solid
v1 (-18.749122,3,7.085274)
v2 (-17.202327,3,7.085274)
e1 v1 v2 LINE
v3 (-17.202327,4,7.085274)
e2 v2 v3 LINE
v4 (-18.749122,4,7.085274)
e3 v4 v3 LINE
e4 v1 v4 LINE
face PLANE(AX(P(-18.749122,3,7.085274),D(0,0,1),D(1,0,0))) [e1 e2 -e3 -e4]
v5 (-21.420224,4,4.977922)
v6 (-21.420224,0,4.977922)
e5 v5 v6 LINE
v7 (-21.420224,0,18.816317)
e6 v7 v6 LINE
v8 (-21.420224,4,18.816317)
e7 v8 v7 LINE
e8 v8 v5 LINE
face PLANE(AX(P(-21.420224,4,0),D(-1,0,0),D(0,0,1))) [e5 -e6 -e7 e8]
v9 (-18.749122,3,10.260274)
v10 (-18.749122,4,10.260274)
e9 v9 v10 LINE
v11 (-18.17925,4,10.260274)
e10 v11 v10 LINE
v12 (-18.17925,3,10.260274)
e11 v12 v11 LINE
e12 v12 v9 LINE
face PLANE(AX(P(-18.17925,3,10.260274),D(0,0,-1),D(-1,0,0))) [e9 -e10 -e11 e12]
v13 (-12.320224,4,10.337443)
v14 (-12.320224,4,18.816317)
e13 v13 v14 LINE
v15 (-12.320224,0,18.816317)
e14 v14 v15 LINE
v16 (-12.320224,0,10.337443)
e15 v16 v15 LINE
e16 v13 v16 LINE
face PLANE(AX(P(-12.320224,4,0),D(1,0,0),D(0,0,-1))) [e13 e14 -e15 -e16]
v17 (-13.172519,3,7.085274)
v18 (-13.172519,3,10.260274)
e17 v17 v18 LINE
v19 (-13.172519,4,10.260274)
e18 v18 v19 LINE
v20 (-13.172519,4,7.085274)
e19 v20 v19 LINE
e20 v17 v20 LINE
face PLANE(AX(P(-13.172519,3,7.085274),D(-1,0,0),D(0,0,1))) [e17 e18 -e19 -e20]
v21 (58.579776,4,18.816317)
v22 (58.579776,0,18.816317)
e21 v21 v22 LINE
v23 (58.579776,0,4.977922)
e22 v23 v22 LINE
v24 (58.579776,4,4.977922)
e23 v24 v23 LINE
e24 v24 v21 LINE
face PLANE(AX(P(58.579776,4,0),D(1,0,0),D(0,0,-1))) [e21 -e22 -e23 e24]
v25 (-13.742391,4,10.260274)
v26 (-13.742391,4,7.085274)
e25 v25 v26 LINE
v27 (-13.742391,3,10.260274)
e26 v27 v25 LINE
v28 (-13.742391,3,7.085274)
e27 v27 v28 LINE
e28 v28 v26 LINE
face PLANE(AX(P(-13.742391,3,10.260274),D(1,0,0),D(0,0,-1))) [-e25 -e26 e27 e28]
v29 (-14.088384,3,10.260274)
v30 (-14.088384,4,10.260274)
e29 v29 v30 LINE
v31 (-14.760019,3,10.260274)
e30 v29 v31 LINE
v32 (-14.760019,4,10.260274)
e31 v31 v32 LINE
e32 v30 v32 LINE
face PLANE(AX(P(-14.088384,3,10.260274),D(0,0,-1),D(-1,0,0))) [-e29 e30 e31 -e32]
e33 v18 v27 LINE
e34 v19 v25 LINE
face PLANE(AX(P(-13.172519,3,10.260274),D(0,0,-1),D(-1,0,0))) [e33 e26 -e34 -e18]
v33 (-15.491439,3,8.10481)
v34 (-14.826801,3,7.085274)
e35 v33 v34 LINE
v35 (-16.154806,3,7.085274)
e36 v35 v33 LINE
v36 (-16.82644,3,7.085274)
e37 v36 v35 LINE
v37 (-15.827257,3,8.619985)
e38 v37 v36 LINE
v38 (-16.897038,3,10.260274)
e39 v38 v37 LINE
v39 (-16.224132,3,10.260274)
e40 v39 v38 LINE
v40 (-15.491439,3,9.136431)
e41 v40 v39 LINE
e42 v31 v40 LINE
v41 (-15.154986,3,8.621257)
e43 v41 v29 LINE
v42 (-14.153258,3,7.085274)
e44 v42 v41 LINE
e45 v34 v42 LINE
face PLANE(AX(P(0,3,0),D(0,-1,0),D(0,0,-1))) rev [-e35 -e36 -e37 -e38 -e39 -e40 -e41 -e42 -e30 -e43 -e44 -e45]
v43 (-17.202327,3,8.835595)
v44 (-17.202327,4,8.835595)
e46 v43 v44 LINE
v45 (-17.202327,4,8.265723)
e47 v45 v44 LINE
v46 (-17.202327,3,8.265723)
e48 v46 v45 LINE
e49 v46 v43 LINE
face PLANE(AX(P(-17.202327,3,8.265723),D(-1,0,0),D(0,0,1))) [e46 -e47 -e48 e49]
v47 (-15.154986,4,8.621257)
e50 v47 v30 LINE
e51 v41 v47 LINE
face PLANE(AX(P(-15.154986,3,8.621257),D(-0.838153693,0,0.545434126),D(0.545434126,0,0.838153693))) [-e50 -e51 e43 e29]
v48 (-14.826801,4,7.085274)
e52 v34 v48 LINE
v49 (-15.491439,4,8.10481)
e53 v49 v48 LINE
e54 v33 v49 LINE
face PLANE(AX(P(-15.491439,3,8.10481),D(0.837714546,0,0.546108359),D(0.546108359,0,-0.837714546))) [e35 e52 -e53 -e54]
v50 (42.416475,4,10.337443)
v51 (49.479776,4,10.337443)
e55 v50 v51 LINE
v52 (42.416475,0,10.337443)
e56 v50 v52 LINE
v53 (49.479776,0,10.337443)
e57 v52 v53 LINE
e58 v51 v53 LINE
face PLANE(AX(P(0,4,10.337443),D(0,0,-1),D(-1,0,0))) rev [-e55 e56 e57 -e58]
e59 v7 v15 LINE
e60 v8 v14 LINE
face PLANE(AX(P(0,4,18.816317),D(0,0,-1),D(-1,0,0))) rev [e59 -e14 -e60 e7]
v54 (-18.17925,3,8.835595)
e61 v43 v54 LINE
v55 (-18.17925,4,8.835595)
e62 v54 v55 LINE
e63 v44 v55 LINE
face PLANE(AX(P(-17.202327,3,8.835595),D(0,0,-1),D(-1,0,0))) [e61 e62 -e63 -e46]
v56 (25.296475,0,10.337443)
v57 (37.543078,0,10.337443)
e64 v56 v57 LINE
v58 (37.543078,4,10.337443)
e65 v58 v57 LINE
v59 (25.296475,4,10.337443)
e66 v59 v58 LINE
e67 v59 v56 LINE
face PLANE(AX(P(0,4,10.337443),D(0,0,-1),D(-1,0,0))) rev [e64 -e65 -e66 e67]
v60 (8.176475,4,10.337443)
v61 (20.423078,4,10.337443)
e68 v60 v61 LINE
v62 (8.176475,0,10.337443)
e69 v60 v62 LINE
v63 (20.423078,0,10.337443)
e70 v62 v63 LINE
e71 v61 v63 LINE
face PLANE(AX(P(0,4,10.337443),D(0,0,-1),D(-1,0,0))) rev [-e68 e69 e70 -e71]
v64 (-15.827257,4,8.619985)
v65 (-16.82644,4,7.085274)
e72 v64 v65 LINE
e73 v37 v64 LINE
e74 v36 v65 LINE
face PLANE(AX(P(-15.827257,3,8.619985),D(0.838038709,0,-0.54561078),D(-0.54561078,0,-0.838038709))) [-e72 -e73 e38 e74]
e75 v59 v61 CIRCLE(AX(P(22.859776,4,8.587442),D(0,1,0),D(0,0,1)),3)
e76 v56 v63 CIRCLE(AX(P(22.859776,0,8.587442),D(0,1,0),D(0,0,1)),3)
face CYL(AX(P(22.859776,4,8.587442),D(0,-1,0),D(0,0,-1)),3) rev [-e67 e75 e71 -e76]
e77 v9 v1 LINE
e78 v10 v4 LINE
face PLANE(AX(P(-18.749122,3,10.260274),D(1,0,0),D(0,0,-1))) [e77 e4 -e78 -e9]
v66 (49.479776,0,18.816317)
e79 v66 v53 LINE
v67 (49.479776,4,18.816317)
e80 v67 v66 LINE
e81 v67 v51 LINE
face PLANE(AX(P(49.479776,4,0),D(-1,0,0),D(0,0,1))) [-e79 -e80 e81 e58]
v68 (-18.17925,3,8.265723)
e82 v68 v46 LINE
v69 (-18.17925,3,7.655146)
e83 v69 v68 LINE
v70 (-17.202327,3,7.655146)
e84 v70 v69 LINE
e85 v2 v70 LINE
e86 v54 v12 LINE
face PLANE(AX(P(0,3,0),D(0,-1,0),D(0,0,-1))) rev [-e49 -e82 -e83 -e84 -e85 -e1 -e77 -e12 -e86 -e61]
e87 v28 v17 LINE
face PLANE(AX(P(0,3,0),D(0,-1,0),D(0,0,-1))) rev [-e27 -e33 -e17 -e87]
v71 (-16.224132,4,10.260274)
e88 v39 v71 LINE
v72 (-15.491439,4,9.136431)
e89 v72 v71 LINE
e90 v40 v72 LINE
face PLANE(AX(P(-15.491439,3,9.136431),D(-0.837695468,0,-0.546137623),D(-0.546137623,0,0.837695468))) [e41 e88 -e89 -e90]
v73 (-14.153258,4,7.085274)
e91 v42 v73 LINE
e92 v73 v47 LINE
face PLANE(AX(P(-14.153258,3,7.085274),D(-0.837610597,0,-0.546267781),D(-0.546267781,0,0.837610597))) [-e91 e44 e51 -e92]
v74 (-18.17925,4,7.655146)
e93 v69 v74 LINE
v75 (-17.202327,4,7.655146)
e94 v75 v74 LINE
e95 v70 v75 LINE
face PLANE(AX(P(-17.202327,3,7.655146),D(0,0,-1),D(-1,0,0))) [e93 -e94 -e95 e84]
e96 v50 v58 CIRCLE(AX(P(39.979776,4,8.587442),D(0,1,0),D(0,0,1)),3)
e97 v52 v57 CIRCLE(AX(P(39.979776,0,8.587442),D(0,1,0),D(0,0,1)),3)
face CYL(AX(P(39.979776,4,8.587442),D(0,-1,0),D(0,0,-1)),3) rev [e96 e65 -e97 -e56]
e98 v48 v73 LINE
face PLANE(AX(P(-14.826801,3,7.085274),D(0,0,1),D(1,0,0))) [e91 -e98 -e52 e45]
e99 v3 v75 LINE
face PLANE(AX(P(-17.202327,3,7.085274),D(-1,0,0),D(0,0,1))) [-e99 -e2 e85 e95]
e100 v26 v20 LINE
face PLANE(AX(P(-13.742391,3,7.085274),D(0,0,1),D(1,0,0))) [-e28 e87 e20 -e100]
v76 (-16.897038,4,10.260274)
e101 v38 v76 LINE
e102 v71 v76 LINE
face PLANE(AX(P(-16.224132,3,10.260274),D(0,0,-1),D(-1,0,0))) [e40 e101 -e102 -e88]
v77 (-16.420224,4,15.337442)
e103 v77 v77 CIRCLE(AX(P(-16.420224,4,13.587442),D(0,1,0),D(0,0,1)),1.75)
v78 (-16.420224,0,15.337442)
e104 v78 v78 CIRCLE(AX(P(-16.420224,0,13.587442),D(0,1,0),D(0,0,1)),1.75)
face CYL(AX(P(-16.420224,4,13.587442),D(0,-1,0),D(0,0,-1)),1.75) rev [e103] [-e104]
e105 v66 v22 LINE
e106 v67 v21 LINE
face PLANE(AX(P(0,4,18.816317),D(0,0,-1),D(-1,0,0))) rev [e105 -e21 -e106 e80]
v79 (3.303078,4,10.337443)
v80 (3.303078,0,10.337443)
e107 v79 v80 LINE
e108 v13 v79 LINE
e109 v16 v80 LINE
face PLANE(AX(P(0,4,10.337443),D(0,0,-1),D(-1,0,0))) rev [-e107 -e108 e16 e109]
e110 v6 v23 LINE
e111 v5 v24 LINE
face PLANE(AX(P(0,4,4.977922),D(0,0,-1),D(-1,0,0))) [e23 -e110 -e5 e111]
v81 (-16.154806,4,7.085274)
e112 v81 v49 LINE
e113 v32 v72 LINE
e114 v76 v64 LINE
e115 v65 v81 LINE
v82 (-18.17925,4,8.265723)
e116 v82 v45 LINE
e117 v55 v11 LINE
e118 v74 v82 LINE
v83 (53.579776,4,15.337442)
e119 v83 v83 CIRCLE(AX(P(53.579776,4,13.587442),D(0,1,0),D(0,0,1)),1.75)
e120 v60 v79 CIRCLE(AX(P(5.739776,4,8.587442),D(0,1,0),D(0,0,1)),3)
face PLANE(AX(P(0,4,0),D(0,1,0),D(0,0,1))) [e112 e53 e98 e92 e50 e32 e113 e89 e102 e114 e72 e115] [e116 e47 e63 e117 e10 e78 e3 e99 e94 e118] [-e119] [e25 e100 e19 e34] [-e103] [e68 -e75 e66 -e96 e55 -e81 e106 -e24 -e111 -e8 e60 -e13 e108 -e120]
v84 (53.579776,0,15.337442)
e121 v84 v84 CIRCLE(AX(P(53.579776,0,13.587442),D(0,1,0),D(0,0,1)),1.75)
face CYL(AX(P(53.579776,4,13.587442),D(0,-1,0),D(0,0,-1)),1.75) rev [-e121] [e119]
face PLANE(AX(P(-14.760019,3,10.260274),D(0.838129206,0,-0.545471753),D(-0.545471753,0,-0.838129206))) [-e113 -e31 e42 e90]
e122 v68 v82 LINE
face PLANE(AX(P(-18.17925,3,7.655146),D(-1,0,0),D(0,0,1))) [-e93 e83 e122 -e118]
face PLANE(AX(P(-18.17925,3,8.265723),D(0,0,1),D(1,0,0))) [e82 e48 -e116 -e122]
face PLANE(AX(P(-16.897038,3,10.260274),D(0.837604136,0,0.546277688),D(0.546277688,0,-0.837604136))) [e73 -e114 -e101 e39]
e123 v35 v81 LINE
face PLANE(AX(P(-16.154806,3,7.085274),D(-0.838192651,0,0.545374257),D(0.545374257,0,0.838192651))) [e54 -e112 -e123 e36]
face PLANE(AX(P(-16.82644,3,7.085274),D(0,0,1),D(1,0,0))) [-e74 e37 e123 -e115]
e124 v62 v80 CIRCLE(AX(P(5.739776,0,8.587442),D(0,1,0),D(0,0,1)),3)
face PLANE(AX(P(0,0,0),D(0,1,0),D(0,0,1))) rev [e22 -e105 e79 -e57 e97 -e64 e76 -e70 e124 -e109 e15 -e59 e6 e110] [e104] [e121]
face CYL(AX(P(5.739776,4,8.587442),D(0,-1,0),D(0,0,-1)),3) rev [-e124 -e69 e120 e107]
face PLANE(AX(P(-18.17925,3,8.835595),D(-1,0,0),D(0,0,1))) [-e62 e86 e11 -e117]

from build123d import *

# Parameters (mm, degrees)
BOSS_EXTRUDE1_OUTLINE_R = 1.75
BOSS_EXTRUDE1_DEPTH     = 4
SKETCH2_W               = 0.569871795
SKETCH2_H               = 3.175
CUT_EXTRUDE1_DEPTH      = 1


# Read off the part's stored shape, not the designer's step: Boss-Extrude1
with BuildPart() as part:
    # Boss-Extrude1 outline → Boss-Extrude1 (new body)
    with BuildSketch(Plane(origin=(0, 0, 0), x_dir=(1, 0, 0), z_dir=(0, 1, 0))):
        with BuildLine():
            Line((25.296474615, -10.33744254), (37.54307775, -10.33744254))
            ThreePointArc((37.54307775, -10.33744254), (39.979776182, -5.587442326), (42.416474615, -10.33744254))
            Line((42.416474615, -10.33744254), (49.479776182, -10.33744254))
            Line((49.479776182, -10.33744254), (49.479776182, -18.81631662))
            Line((49.479776182, -18.81631662), (58.579776182, -18.81631662))
            Line((58.579776182, -18.81631662), (58.579776182, -4.977921711))
            Line((58.579776182, -4.977921711), (-21.420223818, -4.977921711))
            Line((-21.420223818, -4.977921711), (-21.420223818, -18.81631662))
            Line((-21.420223818, -18.81631662), (-12.320223818, -18.81631662))
            Line((-12.320223818, -18.81631662), (-12.320223818, -10.33744254))
            Line((-12.320223818, -10.33744254), (3.30307775, -10.33744254))
            ThreePointArc((3.30307775, -10.33744254), (5.739776182, -5.587442326), (8.176474615, -10.33744254))
            Line((8.176474615, -10.33744254), (20.42307775, -10.33744254))
            ThreePointArc((20.42307775, -10.33744254), (22.859776182, -5.587442326), (25.296474615, -10.33744254))
        make_face()
        with Locations((-16.420223818, -13.587442433)):
            Circle(BOSS_EXTRUDE1_OUTLINE_R, mode=Mode.SUBTRACT)
        with Locations((53.579776182, -13.587442433)):
            Circle(BOSS_EXTRUDE1_OUTLINE_R, mode=Mode.SUBTRACT)
    extrude(amount=BOSS_EXTRUDE1_DEPTH)

    # Sketch2 → Cut-Extrude1 (cut)
    with BuildSketch(Plane(origin=(0, 4, 0), x_dir=(1, 0, 0), z_dir=(0, 1, 0))):
        Polygon((-18.749121586, -7.085274104), (-17.202326714, -7.085274104), (-17.202326714, -7.655145899), (-18.179249791, -7.655145899), (-18.179249791, -8.265722822), (-17.202326714, -8.265722822), (-17.202326714, -8.835594617), (-18.179249791, -8.835594617), (-18.179249791, -10.260274104), (-18.749121586, -10.260274104), align=None)
        Polygon((-16.826440296, -7.085274104), (-16.15480568, -7.085274104), (-15.491439294, -8.104810362), (-14.826800873, -7.085274104), (-14.153258204, -7.085274104), (-15.154985969, -8.621256676), (-14.088384406, -10.260274104), (-14.760019022, -10.260274104), (-15.491439294, -9.136430955), (-16.224131602, -10.260274104), (-16.897038253, -10.260274104), (-15.827256602, -8.619984641), align=None)
        with Locations((-13.45745492, -8.672774104)):
            Rectangle(SKETCH2_W, SKETCH2_H)
    extrude(amount=-CUT_EXTRUDE1_DEPTH, mode=Mode.SUBTRACT)


solid = part.part
